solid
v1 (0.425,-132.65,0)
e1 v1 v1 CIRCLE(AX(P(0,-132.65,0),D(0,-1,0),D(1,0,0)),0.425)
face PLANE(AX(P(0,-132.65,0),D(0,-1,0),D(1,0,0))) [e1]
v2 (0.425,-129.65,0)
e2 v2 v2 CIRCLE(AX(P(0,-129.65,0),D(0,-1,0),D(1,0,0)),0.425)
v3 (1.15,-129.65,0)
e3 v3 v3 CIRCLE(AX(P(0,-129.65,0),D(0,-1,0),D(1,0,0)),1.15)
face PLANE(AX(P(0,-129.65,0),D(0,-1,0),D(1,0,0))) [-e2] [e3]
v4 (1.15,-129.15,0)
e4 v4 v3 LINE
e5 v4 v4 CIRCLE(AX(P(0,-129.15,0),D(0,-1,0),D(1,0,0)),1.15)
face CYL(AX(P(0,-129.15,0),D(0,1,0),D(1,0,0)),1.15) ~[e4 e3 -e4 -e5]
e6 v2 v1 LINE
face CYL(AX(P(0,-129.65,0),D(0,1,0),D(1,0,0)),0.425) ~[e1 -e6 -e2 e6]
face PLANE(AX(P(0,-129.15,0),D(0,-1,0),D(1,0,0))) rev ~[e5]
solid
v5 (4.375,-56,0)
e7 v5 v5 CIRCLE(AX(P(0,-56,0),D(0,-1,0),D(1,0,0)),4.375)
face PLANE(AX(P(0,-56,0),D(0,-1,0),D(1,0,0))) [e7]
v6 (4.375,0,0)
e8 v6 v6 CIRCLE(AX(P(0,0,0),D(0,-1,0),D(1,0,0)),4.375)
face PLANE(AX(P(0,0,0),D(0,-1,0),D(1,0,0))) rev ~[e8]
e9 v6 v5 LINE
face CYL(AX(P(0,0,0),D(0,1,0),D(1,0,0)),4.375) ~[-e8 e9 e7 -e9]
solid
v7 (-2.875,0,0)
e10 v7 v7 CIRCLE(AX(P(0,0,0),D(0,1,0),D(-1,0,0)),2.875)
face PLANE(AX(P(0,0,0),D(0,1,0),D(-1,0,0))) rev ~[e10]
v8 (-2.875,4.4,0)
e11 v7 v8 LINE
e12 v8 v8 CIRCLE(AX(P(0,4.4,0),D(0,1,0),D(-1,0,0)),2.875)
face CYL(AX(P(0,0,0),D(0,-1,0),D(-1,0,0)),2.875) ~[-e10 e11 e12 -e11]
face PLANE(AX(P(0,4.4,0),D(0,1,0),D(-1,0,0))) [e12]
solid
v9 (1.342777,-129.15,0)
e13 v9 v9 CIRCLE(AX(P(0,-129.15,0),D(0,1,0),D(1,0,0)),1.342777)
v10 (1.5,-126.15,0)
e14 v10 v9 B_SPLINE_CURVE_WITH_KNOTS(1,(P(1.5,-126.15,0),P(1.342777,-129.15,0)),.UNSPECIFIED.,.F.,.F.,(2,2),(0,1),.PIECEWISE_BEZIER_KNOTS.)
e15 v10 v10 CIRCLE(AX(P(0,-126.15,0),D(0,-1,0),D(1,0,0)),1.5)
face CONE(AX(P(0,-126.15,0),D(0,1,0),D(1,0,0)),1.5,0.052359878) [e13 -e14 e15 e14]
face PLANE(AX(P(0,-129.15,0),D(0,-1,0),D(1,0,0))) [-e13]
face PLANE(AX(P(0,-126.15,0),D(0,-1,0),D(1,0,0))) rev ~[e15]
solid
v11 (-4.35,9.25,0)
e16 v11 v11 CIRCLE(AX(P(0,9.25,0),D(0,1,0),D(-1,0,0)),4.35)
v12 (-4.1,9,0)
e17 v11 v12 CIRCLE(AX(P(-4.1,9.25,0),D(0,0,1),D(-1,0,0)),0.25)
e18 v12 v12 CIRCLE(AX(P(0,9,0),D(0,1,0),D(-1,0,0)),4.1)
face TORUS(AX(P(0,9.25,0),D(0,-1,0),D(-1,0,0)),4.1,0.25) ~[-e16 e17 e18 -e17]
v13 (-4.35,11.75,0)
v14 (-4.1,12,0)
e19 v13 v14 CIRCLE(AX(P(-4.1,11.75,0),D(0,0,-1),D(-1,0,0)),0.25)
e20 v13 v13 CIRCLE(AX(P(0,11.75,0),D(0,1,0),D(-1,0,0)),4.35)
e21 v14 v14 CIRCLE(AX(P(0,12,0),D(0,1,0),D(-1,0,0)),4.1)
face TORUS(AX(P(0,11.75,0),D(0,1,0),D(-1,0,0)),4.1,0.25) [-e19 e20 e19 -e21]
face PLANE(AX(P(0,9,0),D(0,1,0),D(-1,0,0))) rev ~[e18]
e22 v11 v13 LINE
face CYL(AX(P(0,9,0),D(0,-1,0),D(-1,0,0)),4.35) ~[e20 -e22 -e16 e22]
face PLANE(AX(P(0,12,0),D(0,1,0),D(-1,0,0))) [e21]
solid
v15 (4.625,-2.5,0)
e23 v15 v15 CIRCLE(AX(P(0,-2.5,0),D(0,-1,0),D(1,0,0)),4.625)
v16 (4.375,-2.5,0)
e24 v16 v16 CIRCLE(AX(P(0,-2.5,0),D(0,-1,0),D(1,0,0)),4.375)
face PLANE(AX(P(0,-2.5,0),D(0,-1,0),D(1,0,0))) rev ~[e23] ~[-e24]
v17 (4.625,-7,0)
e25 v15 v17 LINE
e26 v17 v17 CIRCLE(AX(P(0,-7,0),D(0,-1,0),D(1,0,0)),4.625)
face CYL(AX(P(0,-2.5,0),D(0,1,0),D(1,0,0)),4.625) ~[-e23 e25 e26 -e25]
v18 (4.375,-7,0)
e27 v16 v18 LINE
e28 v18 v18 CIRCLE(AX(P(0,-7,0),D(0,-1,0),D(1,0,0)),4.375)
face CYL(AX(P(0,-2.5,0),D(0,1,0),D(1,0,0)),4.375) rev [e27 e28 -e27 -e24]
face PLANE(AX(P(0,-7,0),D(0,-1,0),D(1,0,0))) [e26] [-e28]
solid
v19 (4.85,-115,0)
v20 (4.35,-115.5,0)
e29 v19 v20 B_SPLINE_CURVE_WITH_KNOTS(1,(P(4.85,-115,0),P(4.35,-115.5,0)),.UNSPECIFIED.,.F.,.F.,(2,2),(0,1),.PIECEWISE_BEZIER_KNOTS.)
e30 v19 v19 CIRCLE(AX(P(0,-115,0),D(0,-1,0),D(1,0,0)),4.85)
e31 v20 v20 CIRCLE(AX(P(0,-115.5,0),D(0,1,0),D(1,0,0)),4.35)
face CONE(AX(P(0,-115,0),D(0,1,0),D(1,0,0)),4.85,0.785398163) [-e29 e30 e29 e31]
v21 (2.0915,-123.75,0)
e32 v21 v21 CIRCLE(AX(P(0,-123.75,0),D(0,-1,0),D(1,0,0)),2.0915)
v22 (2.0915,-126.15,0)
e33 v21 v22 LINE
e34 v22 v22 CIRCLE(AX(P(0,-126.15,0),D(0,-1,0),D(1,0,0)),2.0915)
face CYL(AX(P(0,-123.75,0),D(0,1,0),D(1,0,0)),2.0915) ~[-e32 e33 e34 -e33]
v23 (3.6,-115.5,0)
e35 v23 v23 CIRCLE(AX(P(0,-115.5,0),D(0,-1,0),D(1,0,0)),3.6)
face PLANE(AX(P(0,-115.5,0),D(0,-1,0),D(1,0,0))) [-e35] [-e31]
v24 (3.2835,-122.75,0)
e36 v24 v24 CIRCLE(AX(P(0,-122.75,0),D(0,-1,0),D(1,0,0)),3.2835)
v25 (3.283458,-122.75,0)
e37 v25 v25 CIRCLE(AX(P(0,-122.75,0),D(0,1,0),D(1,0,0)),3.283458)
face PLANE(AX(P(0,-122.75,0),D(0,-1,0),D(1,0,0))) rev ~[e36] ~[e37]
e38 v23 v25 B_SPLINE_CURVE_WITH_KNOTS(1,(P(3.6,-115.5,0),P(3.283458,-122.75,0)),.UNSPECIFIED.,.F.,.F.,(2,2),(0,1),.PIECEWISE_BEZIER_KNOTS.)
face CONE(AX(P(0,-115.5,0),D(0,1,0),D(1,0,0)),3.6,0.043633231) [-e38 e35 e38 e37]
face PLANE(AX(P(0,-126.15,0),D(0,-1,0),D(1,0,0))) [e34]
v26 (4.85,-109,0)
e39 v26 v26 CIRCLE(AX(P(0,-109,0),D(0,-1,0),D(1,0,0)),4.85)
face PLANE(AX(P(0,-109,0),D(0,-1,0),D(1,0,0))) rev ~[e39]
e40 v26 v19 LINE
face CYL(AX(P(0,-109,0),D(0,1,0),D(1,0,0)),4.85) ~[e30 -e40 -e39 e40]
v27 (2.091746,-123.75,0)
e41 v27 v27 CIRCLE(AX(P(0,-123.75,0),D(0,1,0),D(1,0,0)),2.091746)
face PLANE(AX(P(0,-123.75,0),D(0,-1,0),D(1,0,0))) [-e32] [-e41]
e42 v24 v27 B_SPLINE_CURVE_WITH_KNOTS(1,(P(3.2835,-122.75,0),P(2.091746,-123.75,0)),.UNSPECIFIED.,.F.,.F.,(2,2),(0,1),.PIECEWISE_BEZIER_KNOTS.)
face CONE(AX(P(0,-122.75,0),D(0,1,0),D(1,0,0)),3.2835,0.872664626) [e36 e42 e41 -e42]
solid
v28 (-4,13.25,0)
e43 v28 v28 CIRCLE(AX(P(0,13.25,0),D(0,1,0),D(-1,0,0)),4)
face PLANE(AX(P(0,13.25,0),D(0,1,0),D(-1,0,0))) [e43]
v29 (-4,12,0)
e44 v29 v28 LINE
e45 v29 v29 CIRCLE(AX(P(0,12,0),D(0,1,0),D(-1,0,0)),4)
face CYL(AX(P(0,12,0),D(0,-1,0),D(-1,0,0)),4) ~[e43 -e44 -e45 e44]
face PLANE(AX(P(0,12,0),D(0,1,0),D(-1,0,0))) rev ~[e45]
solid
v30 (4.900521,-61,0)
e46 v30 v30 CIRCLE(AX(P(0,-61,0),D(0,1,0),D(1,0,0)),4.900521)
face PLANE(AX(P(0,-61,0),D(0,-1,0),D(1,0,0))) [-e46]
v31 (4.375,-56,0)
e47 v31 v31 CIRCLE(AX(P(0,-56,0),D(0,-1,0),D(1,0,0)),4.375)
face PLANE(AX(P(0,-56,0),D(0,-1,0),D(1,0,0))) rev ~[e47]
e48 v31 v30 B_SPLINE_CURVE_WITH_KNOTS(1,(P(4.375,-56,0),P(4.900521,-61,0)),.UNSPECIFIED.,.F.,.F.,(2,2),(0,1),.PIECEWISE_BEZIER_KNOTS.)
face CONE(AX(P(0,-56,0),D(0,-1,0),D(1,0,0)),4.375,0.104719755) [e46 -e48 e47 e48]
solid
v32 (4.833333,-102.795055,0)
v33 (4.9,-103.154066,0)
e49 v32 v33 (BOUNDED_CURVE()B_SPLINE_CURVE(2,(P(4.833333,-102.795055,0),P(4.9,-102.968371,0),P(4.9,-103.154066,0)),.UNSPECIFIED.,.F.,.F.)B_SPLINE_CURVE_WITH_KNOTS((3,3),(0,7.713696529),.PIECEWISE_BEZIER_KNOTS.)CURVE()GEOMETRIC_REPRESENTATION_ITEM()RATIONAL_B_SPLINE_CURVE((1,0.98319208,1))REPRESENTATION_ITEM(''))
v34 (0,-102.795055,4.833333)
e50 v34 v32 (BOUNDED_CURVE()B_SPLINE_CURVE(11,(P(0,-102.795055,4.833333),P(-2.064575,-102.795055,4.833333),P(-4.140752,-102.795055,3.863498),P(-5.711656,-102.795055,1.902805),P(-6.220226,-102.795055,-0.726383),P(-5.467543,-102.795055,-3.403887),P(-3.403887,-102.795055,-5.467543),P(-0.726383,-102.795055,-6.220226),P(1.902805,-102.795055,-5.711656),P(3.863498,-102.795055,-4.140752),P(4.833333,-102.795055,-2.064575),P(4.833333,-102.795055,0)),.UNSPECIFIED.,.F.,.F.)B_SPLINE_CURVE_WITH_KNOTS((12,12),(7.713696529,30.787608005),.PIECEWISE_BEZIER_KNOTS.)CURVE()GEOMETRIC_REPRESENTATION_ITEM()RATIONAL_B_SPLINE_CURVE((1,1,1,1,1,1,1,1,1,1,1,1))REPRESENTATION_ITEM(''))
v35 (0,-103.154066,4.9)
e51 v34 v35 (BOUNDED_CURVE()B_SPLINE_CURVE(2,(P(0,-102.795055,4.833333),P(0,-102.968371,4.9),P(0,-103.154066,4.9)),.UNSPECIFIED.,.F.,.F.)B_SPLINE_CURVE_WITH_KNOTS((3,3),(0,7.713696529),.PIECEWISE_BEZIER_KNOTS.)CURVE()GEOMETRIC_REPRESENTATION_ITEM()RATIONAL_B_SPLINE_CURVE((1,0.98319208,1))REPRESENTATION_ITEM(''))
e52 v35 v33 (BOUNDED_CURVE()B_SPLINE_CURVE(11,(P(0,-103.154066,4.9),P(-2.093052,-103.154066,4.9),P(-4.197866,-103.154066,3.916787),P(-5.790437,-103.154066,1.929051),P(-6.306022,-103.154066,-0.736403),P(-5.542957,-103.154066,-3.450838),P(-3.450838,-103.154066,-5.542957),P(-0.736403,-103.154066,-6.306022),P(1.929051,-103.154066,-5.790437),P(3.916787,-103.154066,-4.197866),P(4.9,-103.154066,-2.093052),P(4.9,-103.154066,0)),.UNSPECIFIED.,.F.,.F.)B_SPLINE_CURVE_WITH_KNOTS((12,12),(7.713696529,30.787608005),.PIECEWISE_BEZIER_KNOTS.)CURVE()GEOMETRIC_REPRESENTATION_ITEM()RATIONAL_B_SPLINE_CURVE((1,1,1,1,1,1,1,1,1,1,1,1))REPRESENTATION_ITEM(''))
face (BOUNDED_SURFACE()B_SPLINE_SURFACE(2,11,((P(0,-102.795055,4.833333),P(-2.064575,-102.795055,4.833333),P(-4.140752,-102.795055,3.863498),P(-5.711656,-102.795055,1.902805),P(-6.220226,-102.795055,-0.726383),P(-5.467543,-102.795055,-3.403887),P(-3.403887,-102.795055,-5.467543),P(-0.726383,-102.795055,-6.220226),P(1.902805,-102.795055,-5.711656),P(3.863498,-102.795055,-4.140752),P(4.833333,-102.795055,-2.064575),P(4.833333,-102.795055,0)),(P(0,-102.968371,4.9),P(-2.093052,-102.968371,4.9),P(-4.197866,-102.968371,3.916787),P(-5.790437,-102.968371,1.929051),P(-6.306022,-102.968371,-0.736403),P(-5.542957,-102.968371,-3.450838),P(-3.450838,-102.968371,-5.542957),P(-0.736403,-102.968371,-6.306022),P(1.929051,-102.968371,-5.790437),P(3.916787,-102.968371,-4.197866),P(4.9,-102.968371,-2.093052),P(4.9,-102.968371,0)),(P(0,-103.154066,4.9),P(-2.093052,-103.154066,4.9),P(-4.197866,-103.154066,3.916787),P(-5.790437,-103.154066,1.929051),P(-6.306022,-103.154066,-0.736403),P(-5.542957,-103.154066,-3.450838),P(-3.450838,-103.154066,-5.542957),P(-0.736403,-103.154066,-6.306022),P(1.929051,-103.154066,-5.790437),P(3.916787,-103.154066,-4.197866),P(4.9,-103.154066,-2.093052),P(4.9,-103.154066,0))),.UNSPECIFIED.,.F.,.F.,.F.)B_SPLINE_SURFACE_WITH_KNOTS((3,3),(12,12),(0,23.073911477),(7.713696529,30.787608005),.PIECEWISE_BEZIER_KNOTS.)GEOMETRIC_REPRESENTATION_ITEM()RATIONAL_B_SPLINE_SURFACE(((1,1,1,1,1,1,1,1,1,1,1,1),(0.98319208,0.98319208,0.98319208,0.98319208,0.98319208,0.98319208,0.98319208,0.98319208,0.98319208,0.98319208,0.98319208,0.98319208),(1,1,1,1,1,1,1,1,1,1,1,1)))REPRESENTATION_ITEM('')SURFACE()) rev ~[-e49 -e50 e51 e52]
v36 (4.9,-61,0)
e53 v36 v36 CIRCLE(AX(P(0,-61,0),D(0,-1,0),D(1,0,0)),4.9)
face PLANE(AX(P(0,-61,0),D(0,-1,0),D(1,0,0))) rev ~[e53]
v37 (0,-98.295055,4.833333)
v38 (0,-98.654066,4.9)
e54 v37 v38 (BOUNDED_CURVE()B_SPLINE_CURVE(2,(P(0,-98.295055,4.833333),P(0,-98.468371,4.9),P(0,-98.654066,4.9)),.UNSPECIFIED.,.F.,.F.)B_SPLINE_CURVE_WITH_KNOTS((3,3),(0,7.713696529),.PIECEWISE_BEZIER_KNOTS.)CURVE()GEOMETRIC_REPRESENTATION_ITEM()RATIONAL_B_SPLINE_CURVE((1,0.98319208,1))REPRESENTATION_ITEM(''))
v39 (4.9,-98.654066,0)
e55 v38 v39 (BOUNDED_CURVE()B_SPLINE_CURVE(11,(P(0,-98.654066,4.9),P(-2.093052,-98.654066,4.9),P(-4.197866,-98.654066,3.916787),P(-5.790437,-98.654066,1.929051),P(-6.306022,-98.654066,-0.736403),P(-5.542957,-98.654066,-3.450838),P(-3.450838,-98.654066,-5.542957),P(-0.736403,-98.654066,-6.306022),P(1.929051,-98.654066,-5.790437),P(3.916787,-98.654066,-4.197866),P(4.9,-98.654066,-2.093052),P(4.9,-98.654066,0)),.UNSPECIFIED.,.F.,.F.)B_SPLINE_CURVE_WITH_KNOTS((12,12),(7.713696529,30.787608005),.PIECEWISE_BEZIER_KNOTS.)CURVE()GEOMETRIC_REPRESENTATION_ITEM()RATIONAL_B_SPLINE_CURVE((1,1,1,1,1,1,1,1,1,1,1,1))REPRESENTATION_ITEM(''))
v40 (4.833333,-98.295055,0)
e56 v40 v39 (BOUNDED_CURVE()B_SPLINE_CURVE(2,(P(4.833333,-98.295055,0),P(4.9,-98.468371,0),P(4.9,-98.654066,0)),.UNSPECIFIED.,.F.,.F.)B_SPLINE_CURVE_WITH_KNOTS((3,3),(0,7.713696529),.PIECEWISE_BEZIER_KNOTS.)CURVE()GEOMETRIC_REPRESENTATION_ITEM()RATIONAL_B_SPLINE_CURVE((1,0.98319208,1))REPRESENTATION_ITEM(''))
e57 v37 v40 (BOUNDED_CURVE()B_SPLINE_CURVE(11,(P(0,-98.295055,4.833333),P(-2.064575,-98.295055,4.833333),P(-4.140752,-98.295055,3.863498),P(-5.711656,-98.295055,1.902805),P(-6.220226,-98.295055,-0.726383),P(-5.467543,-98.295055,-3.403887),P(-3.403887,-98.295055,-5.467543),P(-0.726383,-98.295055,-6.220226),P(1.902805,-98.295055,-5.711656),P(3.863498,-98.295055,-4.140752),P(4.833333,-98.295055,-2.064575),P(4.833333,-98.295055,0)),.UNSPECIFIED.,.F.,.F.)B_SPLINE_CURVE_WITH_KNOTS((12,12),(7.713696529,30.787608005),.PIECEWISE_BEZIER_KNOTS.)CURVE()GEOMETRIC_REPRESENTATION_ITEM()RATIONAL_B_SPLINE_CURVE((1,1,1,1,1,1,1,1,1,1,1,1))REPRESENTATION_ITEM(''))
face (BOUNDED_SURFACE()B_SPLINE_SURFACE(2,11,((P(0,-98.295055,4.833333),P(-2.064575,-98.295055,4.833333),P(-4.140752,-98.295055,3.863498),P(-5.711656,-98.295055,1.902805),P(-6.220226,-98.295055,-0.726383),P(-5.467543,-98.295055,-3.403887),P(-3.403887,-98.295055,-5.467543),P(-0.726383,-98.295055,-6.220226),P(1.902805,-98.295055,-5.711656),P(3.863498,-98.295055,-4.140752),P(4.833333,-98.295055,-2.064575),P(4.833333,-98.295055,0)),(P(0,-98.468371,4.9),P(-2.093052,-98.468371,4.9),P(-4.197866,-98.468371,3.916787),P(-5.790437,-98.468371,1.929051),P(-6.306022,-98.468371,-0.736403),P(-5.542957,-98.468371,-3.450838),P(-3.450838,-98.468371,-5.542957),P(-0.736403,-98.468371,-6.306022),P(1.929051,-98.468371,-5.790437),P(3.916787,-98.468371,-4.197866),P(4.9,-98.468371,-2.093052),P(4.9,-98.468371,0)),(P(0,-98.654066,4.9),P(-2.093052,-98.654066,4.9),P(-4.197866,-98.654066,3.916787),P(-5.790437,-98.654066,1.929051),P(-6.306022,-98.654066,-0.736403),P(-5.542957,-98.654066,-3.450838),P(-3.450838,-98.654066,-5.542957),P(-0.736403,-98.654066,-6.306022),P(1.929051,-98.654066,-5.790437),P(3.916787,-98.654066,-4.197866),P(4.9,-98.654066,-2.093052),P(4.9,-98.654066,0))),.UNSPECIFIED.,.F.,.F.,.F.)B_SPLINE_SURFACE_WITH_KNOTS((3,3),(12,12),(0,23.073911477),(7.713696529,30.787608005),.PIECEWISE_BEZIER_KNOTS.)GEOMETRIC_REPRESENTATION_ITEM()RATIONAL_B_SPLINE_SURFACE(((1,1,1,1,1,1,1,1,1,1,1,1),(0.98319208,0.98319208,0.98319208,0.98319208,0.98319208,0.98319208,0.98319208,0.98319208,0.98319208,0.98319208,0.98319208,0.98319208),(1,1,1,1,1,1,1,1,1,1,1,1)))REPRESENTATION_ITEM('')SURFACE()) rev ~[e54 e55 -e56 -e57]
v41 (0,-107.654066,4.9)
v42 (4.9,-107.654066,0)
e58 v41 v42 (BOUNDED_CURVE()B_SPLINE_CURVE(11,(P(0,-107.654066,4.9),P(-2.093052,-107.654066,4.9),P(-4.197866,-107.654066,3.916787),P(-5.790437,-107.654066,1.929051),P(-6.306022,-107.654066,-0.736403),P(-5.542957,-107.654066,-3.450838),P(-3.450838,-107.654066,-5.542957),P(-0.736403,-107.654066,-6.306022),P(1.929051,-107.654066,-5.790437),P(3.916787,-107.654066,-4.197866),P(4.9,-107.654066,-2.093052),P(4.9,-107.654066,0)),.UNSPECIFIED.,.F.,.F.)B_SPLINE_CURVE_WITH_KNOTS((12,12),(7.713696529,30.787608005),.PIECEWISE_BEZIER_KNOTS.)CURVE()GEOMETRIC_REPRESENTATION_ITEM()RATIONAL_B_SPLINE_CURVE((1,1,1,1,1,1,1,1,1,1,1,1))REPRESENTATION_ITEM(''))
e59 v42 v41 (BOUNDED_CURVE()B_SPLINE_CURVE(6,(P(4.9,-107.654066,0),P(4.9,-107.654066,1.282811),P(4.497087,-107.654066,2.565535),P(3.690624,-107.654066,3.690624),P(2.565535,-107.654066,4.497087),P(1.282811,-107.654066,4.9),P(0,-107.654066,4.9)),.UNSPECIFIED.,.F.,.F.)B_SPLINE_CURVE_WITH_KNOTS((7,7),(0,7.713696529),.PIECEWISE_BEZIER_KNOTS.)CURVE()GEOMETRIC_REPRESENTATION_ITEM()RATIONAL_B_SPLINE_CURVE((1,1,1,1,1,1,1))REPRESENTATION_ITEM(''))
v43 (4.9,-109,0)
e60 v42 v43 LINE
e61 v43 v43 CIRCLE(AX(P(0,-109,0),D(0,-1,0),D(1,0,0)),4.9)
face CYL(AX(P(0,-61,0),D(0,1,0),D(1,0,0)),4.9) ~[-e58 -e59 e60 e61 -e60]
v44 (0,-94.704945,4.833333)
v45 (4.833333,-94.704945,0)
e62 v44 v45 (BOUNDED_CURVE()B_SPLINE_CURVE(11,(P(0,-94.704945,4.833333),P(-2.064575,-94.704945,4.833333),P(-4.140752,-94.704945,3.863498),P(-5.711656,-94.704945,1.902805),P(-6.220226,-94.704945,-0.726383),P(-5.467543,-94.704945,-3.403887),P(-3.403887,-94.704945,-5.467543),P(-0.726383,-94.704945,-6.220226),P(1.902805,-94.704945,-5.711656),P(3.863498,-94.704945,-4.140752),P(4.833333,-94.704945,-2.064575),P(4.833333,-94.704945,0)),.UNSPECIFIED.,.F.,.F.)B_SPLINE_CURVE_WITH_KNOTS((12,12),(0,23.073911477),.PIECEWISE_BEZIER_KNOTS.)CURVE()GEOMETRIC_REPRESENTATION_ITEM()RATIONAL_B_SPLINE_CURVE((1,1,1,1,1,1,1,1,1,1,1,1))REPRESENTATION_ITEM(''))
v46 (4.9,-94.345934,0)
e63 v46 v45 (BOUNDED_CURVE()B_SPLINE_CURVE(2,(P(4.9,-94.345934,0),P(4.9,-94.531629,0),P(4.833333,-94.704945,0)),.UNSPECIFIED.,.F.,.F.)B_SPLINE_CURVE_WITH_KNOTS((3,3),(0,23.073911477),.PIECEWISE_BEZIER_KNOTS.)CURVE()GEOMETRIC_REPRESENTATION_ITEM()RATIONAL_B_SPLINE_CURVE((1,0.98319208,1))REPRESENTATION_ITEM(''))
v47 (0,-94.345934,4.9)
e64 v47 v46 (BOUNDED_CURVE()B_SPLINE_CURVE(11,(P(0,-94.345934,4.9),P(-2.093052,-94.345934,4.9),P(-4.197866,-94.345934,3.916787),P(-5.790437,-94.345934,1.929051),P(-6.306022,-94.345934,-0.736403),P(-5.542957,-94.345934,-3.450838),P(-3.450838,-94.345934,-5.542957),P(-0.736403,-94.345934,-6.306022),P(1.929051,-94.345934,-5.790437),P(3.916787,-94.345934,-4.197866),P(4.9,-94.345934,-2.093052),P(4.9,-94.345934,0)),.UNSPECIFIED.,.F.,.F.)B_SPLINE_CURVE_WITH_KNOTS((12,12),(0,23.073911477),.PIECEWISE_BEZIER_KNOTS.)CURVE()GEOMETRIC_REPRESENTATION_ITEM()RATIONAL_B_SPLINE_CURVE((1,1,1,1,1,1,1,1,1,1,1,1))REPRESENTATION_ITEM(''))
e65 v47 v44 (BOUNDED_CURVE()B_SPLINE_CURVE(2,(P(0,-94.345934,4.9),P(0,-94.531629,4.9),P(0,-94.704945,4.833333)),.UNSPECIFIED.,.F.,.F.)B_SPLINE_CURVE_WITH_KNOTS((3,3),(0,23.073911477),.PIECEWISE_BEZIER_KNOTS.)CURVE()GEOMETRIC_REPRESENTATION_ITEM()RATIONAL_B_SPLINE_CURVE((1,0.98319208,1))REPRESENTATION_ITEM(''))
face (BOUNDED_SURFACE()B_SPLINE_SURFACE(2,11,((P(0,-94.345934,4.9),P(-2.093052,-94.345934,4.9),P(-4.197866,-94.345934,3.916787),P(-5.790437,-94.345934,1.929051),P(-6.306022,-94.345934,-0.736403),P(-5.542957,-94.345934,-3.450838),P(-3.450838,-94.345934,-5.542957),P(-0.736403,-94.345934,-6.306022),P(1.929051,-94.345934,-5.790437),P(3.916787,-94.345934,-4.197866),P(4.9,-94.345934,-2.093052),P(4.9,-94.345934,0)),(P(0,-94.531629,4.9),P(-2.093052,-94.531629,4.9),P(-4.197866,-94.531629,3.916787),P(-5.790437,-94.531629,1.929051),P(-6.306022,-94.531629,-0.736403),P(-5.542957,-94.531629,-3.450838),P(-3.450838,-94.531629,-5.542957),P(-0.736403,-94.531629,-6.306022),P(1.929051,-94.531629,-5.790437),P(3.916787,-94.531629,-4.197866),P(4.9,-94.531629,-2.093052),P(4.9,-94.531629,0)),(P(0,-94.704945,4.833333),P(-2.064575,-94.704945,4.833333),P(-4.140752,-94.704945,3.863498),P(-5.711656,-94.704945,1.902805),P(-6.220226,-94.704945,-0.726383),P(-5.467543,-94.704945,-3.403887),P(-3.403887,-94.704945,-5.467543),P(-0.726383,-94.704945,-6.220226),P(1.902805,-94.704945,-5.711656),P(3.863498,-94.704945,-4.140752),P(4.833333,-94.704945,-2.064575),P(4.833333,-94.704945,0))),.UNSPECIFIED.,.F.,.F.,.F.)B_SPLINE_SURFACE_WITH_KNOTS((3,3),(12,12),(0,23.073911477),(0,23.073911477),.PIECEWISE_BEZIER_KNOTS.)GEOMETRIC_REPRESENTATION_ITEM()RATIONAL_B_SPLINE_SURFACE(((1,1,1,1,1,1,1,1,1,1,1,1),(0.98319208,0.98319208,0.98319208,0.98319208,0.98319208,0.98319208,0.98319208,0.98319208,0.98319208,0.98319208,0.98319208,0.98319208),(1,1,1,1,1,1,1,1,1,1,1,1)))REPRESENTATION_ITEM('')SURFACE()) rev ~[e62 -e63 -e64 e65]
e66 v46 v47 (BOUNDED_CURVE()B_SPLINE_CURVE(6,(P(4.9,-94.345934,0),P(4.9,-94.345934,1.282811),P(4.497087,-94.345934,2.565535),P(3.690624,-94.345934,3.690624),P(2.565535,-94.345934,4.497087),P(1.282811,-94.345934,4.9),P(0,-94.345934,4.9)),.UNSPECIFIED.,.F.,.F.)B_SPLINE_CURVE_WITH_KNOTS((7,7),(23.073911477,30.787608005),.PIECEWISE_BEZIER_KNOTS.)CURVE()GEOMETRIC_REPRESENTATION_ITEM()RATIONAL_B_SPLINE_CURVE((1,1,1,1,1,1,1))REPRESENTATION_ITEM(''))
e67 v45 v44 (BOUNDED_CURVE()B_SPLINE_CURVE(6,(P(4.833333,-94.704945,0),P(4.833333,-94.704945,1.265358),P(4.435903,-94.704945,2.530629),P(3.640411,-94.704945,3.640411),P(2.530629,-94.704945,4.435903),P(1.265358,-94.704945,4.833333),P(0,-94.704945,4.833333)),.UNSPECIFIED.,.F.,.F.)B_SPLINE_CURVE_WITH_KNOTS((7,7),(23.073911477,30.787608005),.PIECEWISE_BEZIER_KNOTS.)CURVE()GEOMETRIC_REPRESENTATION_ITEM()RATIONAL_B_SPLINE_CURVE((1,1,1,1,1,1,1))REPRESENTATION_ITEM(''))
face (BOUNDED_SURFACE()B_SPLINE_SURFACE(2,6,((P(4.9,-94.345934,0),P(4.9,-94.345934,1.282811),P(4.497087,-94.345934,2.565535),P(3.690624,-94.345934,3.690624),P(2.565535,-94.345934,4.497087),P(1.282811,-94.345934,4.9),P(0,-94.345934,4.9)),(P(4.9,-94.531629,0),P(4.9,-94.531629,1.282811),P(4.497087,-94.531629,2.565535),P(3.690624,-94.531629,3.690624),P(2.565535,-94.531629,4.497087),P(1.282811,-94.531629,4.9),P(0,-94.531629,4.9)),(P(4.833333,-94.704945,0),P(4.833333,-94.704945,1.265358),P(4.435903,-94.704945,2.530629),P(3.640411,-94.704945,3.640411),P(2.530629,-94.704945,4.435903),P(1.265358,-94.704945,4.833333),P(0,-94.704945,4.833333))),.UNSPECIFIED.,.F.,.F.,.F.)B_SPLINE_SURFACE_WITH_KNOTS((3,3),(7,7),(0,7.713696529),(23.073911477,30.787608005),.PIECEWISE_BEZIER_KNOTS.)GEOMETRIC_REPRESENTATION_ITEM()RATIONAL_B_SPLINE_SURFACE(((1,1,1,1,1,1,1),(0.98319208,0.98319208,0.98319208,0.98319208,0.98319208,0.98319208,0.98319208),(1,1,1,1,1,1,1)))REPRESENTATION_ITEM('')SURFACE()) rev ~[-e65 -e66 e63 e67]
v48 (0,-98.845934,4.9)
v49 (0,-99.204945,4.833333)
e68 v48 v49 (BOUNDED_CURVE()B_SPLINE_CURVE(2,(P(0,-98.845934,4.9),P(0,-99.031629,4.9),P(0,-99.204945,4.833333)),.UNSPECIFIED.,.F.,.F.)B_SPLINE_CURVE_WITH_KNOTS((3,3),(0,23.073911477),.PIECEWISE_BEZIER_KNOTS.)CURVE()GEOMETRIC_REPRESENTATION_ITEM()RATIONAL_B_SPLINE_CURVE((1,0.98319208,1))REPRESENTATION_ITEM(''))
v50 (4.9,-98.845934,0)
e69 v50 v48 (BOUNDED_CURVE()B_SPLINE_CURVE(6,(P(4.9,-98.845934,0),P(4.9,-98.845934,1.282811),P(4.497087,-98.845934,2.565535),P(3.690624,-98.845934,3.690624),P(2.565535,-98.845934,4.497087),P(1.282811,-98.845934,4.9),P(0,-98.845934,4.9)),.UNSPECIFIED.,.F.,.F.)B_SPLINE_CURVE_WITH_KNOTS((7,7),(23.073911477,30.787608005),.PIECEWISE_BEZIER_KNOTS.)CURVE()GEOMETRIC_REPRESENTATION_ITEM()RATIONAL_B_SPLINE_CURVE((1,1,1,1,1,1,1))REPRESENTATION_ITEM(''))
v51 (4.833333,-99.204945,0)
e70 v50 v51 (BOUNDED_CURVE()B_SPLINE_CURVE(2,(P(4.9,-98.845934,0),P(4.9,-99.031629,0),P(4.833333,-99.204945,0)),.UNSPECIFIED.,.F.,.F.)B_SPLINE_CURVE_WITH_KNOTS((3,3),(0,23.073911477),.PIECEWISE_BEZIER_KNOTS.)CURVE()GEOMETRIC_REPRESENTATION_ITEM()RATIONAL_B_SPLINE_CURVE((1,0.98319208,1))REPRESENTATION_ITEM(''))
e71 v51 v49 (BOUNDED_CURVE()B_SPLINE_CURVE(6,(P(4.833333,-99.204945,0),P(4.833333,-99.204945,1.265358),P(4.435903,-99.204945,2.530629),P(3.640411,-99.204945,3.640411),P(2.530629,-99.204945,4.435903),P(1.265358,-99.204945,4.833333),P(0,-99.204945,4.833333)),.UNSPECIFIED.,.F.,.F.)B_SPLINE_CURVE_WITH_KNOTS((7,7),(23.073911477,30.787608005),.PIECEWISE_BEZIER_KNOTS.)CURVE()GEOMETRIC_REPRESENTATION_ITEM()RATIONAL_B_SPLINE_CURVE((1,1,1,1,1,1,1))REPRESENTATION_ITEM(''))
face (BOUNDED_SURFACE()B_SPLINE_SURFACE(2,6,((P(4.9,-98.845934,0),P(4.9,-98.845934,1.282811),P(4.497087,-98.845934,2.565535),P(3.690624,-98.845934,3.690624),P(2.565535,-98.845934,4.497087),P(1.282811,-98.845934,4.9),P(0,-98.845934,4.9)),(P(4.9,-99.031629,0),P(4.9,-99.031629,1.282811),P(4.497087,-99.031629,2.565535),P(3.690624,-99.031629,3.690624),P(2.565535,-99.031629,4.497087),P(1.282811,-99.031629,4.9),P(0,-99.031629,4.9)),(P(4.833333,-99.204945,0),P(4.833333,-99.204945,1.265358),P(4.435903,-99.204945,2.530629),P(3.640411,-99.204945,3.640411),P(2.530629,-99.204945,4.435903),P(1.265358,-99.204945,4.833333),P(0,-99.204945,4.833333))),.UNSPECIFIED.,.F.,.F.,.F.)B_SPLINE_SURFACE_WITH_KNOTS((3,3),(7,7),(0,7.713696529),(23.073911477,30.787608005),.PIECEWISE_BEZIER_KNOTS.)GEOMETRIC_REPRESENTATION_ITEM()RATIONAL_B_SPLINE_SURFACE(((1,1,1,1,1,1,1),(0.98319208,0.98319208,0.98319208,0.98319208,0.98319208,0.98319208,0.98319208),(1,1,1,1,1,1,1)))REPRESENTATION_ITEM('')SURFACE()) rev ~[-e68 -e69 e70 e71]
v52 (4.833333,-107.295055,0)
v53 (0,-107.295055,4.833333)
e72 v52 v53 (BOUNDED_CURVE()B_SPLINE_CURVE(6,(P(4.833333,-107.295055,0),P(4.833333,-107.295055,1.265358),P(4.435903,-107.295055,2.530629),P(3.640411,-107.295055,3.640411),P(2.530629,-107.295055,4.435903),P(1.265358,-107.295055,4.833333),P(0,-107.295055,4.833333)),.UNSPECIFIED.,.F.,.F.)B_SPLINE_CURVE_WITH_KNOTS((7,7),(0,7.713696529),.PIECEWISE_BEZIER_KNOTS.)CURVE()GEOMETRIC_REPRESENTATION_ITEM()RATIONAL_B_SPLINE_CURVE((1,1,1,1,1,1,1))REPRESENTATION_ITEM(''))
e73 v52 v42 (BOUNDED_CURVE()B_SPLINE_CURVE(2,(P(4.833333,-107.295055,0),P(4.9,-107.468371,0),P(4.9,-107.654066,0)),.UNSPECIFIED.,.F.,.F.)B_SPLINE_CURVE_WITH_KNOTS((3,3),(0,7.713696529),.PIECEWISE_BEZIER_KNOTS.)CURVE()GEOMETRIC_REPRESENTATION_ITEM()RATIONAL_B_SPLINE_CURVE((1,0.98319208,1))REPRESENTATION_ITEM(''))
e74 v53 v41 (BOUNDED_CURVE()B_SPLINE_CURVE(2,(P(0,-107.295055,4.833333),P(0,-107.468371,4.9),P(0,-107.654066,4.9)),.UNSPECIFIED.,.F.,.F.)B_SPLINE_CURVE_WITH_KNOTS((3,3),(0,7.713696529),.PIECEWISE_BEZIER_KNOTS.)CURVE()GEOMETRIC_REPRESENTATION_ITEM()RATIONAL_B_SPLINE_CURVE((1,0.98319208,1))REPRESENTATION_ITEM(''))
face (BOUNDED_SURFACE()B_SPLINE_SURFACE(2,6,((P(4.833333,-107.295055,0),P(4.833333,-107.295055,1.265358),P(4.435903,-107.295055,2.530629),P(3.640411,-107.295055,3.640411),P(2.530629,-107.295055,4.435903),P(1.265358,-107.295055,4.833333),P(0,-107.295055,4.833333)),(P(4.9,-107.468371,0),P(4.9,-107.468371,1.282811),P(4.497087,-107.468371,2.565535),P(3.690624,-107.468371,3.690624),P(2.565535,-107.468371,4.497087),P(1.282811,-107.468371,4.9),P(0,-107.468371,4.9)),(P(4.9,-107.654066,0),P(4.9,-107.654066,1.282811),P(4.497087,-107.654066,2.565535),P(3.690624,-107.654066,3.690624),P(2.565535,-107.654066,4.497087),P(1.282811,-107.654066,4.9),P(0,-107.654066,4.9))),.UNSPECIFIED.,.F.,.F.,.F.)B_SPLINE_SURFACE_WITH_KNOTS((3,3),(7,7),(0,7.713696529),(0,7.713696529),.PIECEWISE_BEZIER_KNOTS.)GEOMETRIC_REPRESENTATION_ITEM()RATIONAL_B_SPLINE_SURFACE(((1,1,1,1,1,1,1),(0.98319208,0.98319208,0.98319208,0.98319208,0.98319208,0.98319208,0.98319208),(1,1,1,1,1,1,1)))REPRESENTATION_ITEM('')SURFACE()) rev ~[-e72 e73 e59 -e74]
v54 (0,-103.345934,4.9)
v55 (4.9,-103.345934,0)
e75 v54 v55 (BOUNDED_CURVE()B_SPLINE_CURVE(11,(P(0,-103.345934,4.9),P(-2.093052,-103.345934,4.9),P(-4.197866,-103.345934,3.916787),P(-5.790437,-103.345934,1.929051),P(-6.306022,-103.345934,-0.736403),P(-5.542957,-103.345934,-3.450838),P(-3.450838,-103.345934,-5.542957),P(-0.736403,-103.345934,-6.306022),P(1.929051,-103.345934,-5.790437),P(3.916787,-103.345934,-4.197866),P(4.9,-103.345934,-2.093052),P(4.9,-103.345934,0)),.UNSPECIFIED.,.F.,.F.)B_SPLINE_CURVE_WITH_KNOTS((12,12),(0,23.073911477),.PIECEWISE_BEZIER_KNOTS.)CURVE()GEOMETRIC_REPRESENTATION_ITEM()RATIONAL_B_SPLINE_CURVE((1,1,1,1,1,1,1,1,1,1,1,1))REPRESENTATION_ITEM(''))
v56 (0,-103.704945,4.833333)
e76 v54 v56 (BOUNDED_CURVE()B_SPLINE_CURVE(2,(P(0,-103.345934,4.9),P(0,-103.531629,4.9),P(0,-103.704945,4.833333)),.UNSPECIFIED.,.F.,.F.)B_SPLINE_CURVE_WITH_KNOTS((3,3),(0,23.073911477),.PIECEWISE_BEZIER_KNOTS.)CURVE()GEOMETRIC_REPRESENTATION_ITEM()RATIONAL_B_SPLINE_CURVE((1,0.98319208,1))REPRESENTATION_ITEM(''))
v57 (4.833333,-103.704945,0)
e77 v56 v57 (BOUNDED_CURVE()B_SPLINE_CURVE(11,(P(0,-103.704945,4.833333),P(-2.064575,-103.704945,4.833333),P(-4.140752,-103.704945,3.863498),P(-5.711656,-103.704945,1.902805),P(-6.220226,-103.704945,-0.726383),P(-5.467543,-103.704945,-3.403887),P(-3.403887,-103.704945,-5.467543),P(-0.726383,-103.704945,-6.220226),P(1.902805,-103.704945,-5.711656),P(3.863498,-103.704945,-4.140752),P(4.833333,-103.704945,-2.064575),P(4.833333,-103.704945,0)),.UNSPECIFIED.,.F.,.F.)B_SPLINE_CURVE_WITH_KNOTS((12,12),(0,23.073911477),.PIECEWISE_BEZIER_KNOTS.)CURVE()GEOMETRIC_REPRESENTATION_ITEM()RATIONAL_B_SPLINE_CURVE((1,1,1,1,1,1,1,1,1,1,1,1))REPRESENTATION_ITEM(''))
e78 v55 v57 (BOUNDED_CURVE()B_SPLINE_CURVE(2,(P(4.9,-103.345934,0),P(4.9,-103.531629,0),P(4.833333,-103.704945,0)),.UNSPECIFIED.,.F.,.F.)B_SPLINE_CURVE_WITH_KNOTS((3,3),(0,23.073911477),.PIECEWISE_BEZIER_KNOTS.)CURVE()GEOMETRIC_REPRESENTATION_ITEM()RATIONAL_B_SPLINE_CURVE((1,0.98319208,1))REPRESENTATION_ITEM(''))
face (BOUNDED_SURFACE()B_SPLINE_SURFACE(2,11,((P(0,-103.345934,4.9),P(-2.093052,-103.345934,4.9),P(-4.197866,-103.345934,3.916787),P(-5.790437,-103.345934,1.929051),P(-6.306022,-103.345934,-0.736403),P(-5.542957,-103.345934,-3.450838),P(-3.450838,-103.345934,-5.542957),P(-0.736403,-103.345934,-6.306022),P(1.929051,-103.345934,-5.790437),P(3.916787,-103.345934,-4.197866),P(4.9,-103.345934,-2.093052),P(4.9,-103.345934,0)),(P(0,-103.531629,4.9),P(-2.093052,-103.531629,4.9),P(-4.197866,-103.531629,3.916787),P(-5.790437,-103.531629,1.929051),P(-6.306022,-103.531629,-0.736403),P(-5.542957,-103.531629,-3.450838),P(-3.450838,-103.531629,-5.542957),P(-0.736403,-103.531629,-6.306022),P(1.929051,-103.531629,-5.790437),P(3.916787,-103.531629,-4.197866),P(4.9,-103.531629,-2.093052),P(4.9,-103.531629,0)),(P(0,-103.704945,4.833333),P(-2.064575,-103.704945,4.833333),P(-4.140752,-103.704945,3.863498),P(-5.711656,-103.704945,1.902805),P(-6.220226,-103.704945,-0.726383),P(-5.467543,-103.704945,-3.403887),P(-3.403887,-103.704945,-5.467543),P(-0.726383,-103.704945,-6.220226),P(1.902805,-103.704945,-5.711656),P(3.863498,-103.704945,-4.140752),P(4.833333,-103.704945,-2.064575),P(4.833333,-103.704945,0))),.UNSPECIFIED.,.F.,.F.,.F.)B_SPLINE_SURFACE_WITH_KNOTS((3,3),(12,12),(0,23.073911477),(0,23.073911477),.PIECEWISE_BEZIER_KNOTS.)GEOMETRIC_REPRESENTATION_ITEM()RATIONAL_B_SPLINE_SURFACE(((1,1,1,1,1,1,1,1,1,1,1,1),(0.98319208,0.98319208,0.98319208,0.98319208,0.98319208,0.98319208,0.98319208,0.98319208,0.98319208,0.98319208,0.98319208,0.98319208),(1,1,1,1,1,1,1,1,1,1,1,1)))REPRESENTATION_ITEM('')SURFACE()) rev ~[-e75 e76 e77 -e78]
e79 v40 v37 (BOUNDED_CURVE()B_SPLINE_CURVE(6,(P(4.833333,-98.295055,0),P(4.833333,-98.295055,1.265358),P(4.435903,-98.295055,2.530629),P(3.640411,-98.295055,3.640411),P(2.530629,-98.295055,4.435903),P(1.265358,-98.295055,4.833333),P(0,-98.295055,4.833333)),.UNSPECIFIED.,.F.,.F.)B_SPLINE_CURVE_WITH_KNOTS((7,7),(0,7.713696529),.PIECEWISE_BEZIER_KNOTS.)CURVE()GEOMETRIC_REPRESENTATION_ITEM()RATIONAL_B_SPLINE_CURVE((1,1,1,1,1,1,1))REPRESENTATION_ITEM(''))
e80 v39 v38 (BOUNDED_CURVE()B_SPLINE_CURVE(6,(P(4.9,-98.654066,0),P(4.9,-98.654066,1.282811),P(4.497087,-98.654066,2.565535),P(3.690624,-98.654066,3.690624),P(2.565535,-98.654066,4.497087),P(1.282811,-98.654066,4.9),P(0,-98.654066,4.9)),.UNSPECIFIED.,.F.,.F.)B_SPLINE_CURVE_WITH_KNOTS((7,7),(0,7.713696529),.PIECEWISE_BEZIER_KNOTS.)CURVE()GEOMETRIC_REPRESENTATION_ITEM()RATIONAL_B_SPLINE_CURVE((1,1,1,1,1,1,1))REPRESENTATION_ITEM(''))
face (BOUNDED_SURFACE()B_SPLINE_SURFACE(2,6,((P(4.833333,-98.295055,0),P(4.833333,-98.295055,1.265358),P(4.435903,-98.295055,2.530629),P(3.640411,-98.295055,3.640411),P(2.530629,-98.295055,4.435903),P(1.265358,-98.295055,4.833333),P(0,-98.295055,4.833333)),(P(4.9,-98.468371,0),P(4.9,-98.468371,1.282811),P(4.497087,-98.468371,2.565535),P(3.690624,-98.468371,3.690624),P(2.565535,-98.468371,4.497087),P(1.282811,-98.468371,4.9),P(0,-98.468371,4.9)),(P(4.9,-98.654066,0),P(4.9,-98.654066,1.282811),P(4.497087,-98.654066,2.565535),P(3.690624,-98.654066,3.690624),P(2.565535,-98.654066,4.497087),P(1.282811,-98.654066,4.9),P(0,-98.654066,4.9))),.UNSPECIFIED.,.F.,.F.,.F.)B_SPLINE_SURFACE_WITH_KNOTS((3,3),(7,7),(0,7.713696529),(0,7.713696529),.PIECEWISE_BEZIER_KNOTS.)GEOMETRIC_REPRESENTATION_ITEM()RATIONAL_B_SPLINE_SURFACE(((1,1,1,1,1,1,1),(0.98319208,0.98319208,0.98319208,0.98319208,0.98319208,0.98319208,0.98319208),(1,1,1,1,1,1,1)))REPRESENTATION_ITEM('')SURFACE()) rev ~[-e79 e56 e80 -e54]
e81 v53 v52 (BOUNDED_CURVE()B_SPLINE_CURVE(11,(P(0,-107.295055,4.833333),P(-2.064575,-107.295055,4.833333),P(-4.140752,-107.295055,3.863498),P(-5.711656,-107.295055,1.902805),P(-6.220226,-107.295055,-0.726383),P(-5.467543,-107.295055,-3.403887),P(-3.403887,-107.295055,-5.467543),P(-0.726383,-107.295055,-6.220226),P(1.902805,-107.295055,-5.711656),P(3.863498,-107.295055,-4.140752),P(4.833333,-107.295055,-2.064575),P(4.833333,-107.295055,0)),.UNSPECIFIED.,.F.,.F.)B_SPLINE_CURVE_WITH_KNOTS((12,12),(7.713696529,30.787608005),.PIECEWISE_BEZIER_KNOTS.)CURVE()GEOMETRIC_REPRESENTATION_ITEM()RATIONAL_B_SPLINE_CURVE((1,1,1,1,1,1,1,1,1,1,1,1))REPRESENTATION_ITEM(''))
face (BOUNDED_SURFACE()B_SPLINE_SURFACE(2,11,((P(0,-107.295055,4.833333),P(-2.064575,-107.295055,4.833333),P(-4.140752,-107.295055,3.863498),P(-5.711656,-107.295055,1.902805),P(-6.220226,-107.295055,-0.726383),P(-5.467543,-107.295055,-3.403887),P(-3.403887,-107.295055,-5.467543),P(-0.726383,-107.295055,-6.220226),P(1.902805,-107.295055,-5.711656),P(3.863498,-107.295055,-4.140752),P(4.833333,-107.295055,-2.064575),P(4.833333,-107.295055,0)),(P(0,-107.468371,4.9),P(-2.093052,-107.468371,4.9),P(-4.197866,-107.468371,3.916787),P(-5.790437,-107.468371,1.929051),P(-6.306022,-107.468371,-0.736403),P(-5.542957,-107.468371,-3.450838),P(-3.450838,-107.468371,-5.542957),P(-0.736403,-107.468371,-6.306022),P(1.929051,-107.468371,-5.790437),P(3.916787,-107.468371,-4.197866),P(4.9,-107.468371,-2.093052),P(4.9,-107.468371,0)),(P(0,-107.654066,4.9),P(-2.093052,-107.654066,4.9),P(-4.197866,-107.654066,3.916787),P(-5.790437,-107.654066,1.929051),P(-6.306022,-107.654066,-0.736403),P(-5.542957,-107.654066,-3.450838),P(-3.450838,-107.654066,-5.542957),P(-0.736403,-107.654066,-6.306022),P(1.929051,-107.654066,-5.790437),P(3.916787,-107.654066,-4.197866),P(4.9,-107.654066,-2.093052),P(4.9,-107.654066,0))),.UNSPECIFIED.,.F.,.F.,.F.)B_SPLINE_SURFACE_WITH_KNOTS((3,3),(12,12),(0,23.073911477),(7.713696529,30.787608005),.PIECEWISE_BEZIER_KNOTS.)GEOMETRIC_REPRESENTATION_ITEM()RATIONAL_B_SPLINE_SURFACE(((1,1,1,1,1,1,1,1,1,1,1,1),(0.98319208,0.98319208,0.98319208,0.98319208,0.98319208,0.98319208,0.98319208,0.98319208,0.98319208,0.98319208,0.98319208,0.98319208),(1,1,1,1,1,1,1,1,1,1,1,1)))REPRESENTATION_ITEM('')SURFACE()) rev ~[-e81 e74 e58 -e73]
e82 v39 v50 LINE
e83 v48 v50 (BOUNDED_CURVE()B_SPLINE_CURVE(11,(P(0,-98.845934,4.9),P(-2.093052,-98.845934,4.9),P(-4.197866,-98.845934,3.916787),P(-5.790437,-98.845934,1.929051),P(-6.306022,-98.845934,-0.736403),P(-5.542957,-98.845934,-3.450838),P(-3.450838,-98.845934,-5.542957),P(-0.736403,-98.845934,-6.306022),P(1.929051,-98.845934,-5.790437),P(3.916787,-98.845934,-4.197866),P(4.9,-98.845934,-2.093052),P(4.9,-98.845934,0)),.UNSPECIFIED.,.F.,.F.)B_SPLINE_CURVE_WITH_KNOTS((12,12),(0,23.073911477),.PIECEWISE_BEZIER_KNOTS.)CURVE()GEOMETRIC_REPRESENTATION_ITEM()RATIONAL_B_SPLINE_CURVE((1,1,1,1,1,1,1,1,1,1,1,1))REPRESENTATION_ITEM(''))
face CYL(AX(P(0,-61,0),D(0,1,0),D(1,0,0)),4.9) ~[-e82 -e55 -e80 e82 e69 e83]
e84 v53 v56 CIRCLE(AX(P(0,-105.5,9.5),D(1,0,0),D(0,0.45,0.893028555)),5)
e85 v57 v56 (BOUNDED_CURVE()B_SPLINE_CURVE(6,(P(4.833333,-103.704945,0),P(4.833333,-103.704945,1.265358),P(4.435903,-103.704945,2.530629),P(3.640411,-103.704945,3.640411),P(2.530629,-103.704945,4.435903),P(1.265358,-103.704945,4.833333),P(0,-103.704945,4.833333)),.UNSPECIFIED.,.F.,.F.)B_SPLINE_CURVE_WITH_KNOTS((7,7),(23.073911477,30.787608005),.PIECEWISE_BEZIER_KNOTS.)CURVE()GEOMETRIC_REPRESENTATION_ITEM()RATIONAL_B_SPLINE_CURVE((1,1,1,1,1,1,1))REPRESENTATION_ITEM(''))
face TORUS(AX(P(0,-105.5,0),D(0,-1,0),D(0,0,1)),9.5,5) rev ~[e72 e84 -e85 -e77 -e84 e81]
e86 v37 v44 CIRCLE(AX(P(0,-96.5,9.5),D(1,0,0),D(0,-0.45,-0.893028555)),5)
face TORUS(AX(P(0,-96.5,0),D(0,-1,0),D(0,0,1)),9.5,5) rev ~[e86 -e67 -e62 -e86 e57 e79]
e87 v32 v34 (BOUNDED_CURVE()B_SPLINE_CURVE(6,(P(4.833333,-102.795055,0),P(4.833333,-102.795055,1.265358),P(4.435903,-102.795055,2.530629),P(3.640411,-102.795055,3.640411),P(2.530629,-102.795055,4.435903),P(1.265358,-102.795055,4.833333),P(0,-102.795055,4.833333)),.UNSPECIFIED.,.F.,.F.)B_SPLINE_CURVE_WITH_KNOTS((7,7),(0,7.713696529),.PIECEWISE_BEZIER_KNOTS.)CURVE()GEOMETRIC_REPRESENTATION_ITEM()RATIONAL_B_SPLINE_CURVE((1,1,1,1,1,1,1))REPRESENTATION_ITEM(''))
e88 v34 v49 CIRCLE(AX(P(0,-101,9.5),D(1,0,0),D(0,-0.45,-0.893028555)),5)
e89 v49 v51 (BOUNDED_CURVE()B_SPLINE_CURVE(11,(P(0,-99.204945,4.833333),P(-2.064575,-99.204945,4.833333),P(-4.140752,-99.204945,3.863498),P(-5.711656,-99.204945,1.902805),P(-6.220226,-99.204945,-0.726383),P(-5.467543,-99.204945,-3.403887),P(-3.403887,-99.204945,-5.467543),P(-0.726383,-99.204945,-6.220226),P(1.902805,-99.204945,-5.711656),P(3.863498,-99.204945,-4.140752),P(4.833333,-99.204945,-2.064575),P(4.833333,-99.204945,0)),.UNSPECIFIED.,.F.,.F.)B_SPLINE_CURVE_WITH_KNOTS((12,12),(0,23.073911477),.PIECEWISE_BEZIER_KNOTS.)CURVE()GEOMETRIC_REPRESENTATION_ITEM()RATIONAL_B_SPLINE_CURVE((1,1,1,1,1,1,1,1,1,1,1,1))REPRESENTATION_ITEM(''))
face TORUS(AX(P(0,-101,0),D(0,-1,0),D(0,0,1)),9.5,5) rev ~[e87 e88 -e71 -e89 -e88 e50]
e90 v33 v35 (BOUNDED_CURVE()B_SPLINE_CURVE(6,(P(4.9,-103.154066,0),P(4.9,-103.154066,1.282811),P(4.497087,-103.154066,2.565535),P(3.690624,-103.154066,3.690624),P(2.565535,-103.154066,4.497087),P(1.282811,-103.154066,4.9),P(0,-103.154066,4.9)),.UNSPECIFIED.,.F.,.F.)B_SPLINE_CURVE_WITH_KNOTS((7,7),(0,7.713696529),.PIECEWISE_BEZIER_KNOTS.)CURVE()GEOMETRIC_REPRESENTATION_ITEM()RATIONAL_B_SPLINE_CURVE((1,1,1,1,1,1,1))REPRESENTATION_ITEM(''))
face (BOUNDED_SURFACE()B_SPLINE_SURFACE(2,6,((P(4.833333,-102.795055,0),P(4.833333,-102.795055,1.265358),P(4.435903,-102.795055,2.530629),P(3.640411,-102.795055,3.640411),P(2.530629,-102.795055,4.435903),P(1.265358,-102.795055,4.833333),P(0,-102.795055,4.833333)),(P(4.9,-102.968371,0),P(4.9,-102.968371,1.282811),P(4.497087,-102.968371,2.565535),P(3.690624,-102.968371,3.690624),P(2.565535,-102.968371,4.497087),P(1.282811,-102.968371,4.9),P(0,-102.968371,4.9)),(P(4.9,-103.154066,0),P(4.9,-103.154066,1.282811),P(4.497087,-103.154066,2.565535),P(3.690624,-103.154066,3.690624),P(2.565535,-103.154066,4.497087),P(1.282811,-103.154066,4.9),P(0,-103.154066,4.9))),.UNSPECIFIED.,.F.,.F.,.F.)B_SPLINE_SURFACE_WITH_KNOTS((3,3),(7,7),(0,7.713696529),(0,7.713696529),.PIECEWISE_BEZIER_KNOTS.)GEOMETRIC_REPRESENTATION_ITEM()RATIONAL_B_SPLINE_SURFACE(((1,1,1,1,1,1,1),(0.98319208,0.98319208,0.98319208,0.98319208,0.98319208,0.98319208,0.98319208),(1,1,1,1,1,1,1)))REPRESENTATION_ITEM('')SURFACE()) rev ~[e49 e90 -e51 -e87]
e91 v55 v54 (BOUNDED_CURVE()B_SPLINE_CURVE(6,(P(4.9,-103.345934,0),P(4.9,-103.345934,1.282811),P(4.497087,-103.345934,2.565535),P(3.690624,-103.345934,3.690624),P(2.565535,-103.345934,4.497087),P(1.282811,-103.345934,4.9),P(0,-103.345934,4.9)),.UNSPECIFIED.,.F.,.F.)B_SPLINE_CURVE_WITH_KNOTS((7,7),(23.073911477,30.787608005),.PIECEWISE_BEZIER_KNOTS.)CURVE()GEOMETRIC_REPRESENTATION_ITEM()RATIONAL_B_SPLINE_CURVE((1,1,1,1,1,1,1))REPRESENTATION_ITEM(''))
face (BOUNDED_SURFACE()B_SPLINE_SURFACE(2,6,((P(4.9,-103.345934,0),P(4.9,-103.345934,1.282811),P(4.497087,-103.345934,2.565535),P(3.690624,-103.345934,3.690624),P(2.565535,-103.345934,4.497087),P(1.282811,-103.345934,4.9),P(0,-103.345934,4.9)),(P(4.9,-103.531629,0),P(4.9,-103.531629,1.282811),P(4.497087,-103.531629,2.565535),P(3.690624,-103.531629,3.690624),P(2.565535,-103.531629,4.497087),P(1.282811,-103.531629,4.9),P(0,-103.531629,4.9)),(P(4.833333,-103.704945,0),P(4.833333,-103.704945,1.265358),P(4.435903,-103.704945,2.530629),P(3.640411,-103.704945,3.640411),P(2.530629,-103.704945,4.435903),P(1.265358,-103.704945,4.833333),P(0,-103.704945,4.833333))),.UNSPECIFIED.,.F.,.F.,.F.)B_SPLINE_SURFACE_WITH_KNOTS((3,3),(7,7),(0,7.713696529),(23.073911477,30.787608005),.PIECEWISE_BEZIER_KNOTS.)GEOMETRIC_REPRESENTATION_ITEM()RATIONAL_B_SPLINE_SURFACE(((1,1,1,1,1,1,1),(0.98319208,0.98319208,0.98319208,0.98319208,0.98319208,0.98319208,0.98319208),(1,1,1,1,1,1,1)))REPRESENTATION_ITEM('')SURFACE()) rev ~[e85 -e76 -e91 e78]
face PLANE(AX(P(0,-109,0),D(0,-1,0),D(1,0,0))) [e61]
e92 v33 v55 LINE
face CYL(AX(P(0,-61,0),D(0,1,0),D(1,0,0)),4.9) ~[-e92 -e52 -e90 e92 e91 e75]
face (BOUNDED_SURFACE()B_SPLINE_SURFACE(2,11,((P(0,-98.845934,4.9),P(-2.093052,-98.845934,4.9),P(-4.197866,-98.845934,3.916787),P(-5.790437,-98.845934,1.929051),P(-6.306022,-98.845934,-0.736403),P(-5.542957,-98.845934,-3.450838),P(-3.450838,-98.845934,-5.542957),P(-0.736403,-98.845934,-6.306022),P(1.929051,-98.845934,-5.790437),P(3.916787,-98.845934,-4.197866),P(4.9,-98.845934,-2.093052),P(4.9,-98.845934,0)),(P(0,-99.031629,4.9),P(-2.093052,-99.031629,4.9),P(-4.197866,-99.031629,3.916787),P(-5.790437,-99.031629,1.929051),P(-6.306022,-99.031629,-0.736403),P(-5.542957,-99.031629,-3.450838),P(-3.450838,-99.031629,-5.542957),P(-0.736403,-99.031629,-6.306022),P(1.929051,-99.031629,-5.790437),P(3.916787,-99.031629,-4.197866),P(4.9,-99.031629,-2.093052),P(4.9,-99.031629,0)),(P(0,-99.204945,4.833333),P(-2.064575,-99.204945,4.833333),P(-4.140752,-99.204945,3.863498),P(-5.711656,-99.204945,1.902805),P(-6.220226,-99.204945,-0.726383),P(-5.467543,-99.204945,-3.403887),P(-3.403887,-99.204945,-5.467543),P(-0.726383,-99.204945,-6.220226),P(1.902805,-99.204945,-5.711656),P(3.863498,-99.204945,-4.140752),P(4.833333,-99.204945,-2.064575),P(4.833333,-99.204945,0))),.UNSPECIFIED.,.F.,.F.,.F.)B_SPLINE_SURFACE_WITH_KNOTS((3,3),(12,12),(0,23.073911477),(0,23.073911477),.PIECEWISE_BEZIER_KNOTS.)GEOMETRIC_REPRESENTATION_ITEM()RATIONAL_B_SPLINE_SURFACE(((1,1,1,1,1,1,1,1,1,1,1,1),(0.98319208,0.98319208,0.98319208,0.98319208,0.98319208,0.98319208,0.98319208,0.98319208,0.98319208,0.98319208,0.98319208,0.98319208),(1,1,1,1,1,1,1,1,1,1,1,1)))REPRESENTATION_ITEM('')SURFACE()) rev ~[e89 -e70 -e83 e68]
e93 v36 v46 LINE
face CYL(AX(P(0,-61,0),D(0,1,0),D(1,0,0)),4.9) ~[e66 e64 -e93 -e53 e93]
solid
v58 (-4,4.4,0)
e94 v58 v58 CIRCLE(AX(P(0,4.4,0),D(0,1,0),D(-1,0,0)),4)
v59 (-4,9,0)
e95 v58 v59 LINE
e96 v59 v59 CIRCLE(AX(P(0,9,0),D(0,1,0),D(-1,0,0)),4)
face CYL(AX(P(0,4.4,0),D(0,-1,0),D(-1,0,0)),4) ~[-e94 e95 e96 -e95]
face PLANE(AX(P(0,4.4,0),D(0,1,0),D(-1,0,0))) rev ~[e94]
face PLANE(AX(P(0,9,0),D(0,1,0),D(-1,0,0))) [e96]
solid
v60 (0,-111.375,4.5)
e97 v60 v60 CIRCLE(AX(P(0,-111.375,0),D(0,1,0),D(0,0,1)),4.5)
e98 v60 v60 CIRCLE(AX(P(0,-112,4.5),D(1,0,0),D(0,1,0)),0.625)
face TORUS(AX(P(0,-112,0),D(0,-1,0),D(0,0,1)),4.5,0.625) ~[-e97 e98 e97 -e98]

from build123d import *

# Parameters (mm, degrees)
F0_R      = 4.375
F1_DEPTH  = 56
F2_R      = 2.875
F3_DEPTH  = 4.4
F4_R      = 4
F5_DEPTH  = 4.6
F6_R      = 4.35
F7_DEPTH  = 3
F8_R      = 4
F9_DEPTH  = 1.25
F10_R     = 0.25
F11_R     = 4.375
F12_DEPTH = 5
F12_TAPER = -6
F13_R     = 4.9
F14_DEPTH = 48
F17_R     = 1
F18_R     = 4.85
F19_DEPTH = 6
F20_R     = 4.85
F21_DEPTH = 0.5
F21_TAPER = 45
F22_R     = 3.6
F23_DEPTH = 7.25
F23_TAPER = 2.5
F24_R     = 3.2835
F25_DEPTH = 1
F25_TAPER = 50
F26_R     = 2.0915
F27_DEPTH = 2.4
F28_R     = 1.5
F29_DEPTH = 3
F29_TAPER = 3
F30_R     = 1.15
F31_DEPTH = 0.5
F32_R     = 0.425
F33_DEPTH = 3
F35_R     = 4.625
F35_R_2   = 4.375
F36_DEPTH = 4.5
F37_R     = 0.625


with BuildPart() as f1:
    # F0 (on Front) → F1 (new body)
    with BuildSketch(Plane.XZ):
        Circle(F0_R)
    extrude(amount=F1_DEPTH)


with BuildPart() as f3:
    # F2 (on face) → F3 (new body)
    with BuildSketch(Plane(origin=(0, 0, 0), x_dir=(-1, 0, 0), z_dir=(0, 1, 0))):
        Circle(F2_R)
    extrude(amount=F3_DEPTH)


with BuildPart() as f5:
    # F4 (on face) → F5 (new body)
    with BuildSketch(Plane(origin=(0, 4.4, 0), x_dir=(-1, 0, 0), z_dir=(0, 1, 0))):
        Circle(F4_R)
    extrude(amount=F5_DEPTH)


with BuildPart() as f7:
    # F6 (on face) → F7 (new body)
    with BuildSketch(Plane(origin=(0, 9, 0), x_dir=(-1, 0, 0), z_dir=(0, 1, 0))):
        Circle(F6_R)
    extrude(amount=F7_DEPTH)

    # F10
    f10_edges = [f7.edges().sort_by_distance(p)[0] for p in [
        (4.35, 12, 0),
        (4.35, 9, 0),
    ]]
    fillet(f10_edges, radius=F10_R)


with BuildPart() as f9:
    # F8 (on face) → F9 (new body)
    with BuildSketch(Plane(origin=(0, 12, 0), x_dir=(-1, 0, 0), z_dir=(0, 1, 0))):
        Circle(F8_R)
    extrude(amount=F9_DEPTH)


with BuildPart() as f12:
    # F11 (on face) → F12 (new body)
    with BuildSketch(Plane.XZ.offset(56)):
        Circle(F11_R)
    extrude(amount=F12_DEPTH, taper=F12_TAPER)


with BuildPart() as f14:
    # F13 (on face) → F14 (new body)
    with BuildSketch(Plane.XZ.offset(61)):
        Circle(F13_R)
    extrude(amount=F14_DEPTH)

    # F15 (on Right) → F16 (revolve, cut)
    with BuildSketch(Plane.YZ):
        with BuildLine():
            ThreePointArc((-101, 11.6794494718), (-100.6266028276, 10.6180339887), (-100.5, 9.5))
            ThreePointArc((-100.5, 9.5), (-100.6266028276, 8.3819660113), (-101, 7.3205505282))
            ThreePointArc((-101, 7.3205505282), (-100.0632461982, 5.9923973242), (-98.75, 5.0348572251))
            ThreePointArc((-98.75, 5.0348572251), (-96.7426534085, 6.8779778796), (-96, 9.5))
            ThreePointArc((-96, 9.5), (-96.7426534085, 12.1220221204), (-98.75, 13.9651427749))
            ThreePointArc((-98.75, 13.9651427749), (-100.0632461982, 13.0076026758), (-101, 11.6794494718))
        make_face()
        with BuildLine():
            ThreePointArc((-101, 7.3205505282), (-101.5, 9.5), (-101, 11.6794494718))
            ThreePointArc((-101, 11.6794494718), (-101.9367538018, 13.0076026758), (-103.25, 13.9651427749))
            ThreePointArc((-103.25, 13.9651427749), (-106, 9.5), (-103.25, 5.0348572251))
            ThreePointArc((-103.25, 5.0348572251), (-101.9367538018, 5.9923973242), (-101, 7.3205505282))
        make_face()
        with BuildLine():
            ThreePointArc((-103.25, 13.9651427749), (-101.9367538018, 13.0076026758), (-101, 11.6794494718))
            ThreePointArc((-101, 11.6794494718), (-100.0632461982, 13.0076026758), (-98.75, 13.9651427749))
            ThreePointArc((-98.75, 13.9651427749), (-101, 14.5), (-103.25, 13.9651427749))
        make_face()
        with BuildLine():
            ThreePointArc((-98.75, 5.0348572251), (-100.0632461982, 5.9923973242), (-101, 7.3205505282))
            ThreePointArc((-101, 7.3205505282), (-101.9367538018, 5.9923973242), (-103.25, 5.0348572251))
            ThreePointArc((-103.25, 5.0348572251), (-101, 4.5), (-98.75, 5.0348572251))
        make_face()
        with BuildLine():
            ThreePointArc((-103.25, 5.0348572251), (-106, 9.5), (-103.25, 13.9651427749))
            ThreePointArc((-103.25, 13.9651427749), (-110.5, 9.5), (-103.25, 5.0348572251))
        make_face()
        with BuildLine():
            ThreePointArc((-91.5, 9.5), (-93.8779778796, 13.7573465915), (-98.75, 13.9651427749))
            ThreePointArc((-98.75, 13.9651427749), (-96.7426534085, 12.1220221204), (-96, 9.5))
            ThreePointArc((-96, 9.5), (-96.7426534085, 6.8779778796), (-98.75, 5.0348572251))
            ThreePointArc((-98.75, 5.0348572251), (-93.8779778796, 5.2426534085), (-91.5, 9.5))
        make_face()
    revolve(axis=Axis((0, -109, 0), (0, -1, 0)), mode=Mode.SUBTRACT)

    # F17
    f17_edges = [f14.edges().sort_by_distance(p)[0] for p in [
        (-3.464823, -103.540408, -3.464823),
        (3.464823, -103.540408, 3.464823),
        (3.464823, -107.459592, 3.464823),
        (-3.464823, -107.459592, -3.464823),
        (-3.464823, -94.540408, -3.464823),
        (3.464823, -94.540408, 3.464823),
        (3.464823, -98.459592, 3.464823),
        (-3.464823, -98.459592, -3.464823),
        (-3.464823, -99.040408, -3.464823),
        (3.464823, -99.040408, 3.464823),
        (3.464823, -102.959592, 3.464823),
        (-3.464823, -102.959592, -3.464823),
    ]]
    fillet(f17_edges, radius=F17_R)


with BuildPart() as f19:
    # F18 (on face) → F19 (new body)
    with BuildSketch(Plane.XZ.offset(109)):
        Circle(F18_R)
    extrude(amount=F19_DEPTH)

    # F20 (on face) → F21 (join)
    with BuildSketch(Plane.XZ.offset(115)):
        Circle(F20_R)
    extrude(amount=F21_DEPTH, taper=F21_TAPER)

    # F22 (on face) → F23 (join)
    with BuildSketch(Plane.XZ.offset(115.5)):
        Circle(F22_R)
    extrude(amount=F23_DEPTH, taper=F23_TAPER)

    # F24 (on face) → F25 (join)
    with BuildSketch(Plane.XZ.offset(122.75)):
        Circle(F24_R)
    extrude(amount=F25_DEPTH, taper=F25_TAPER)

    # F26 (on face) → F27 (join)
    with BuildSketch(Plane.XZ.offset(123.75)):
        Circle(F26_R)
    extrude(amount=F27_DEPTH)


with BuildPart() as f29:
    # F28 (on face) → F29 (new body)
    with BuildSketch(Plane.XZ.offset(126.15)):
        Circle(F28_R)
    extrude(amount=F29_DEPTH, taper=F29_TAPER)


with BuildPart() as f31:
    # F30 (on face) → F31 (new body)
    with BuildSketch(Plane.XZ.offset(129.15)):
        Circle(F30_R)
    extrude(amount=F31_DEPTH)

    # F32 (on face) → F33 (join)
    with BuildSketch(Plane.XZ.offset(129.65)):
        Circle(F32_R)
    extrude(amount=F33_DEPTH)


with BuildPart() as f36:
    # F35 (on offset) → F36 (new body)
    with BuildSketch(Plane.XZ.offset(2.5)):
        Circle(F35_R)
        Circle(F35_R_2, mode=Mode.SUBTRACT)
    extrude(amount=F36_DEPTH)


with BuildPart() as f38:
    # F37 (on Right) → F38 (revolve)
    with BuildSketch(Plane.YZ):
        with Locations((-112, 4.5)):
            Circle(F37_R)
    revolve(axis=Axis((0, -109, 0), (0, 1, 0)))


solid = Compound([f1.part, f3.part, f5.part, f7.part, f9.part, f12.part, f14.part, f19.part, f29.part, f31.part, f36.part, f38.part])
